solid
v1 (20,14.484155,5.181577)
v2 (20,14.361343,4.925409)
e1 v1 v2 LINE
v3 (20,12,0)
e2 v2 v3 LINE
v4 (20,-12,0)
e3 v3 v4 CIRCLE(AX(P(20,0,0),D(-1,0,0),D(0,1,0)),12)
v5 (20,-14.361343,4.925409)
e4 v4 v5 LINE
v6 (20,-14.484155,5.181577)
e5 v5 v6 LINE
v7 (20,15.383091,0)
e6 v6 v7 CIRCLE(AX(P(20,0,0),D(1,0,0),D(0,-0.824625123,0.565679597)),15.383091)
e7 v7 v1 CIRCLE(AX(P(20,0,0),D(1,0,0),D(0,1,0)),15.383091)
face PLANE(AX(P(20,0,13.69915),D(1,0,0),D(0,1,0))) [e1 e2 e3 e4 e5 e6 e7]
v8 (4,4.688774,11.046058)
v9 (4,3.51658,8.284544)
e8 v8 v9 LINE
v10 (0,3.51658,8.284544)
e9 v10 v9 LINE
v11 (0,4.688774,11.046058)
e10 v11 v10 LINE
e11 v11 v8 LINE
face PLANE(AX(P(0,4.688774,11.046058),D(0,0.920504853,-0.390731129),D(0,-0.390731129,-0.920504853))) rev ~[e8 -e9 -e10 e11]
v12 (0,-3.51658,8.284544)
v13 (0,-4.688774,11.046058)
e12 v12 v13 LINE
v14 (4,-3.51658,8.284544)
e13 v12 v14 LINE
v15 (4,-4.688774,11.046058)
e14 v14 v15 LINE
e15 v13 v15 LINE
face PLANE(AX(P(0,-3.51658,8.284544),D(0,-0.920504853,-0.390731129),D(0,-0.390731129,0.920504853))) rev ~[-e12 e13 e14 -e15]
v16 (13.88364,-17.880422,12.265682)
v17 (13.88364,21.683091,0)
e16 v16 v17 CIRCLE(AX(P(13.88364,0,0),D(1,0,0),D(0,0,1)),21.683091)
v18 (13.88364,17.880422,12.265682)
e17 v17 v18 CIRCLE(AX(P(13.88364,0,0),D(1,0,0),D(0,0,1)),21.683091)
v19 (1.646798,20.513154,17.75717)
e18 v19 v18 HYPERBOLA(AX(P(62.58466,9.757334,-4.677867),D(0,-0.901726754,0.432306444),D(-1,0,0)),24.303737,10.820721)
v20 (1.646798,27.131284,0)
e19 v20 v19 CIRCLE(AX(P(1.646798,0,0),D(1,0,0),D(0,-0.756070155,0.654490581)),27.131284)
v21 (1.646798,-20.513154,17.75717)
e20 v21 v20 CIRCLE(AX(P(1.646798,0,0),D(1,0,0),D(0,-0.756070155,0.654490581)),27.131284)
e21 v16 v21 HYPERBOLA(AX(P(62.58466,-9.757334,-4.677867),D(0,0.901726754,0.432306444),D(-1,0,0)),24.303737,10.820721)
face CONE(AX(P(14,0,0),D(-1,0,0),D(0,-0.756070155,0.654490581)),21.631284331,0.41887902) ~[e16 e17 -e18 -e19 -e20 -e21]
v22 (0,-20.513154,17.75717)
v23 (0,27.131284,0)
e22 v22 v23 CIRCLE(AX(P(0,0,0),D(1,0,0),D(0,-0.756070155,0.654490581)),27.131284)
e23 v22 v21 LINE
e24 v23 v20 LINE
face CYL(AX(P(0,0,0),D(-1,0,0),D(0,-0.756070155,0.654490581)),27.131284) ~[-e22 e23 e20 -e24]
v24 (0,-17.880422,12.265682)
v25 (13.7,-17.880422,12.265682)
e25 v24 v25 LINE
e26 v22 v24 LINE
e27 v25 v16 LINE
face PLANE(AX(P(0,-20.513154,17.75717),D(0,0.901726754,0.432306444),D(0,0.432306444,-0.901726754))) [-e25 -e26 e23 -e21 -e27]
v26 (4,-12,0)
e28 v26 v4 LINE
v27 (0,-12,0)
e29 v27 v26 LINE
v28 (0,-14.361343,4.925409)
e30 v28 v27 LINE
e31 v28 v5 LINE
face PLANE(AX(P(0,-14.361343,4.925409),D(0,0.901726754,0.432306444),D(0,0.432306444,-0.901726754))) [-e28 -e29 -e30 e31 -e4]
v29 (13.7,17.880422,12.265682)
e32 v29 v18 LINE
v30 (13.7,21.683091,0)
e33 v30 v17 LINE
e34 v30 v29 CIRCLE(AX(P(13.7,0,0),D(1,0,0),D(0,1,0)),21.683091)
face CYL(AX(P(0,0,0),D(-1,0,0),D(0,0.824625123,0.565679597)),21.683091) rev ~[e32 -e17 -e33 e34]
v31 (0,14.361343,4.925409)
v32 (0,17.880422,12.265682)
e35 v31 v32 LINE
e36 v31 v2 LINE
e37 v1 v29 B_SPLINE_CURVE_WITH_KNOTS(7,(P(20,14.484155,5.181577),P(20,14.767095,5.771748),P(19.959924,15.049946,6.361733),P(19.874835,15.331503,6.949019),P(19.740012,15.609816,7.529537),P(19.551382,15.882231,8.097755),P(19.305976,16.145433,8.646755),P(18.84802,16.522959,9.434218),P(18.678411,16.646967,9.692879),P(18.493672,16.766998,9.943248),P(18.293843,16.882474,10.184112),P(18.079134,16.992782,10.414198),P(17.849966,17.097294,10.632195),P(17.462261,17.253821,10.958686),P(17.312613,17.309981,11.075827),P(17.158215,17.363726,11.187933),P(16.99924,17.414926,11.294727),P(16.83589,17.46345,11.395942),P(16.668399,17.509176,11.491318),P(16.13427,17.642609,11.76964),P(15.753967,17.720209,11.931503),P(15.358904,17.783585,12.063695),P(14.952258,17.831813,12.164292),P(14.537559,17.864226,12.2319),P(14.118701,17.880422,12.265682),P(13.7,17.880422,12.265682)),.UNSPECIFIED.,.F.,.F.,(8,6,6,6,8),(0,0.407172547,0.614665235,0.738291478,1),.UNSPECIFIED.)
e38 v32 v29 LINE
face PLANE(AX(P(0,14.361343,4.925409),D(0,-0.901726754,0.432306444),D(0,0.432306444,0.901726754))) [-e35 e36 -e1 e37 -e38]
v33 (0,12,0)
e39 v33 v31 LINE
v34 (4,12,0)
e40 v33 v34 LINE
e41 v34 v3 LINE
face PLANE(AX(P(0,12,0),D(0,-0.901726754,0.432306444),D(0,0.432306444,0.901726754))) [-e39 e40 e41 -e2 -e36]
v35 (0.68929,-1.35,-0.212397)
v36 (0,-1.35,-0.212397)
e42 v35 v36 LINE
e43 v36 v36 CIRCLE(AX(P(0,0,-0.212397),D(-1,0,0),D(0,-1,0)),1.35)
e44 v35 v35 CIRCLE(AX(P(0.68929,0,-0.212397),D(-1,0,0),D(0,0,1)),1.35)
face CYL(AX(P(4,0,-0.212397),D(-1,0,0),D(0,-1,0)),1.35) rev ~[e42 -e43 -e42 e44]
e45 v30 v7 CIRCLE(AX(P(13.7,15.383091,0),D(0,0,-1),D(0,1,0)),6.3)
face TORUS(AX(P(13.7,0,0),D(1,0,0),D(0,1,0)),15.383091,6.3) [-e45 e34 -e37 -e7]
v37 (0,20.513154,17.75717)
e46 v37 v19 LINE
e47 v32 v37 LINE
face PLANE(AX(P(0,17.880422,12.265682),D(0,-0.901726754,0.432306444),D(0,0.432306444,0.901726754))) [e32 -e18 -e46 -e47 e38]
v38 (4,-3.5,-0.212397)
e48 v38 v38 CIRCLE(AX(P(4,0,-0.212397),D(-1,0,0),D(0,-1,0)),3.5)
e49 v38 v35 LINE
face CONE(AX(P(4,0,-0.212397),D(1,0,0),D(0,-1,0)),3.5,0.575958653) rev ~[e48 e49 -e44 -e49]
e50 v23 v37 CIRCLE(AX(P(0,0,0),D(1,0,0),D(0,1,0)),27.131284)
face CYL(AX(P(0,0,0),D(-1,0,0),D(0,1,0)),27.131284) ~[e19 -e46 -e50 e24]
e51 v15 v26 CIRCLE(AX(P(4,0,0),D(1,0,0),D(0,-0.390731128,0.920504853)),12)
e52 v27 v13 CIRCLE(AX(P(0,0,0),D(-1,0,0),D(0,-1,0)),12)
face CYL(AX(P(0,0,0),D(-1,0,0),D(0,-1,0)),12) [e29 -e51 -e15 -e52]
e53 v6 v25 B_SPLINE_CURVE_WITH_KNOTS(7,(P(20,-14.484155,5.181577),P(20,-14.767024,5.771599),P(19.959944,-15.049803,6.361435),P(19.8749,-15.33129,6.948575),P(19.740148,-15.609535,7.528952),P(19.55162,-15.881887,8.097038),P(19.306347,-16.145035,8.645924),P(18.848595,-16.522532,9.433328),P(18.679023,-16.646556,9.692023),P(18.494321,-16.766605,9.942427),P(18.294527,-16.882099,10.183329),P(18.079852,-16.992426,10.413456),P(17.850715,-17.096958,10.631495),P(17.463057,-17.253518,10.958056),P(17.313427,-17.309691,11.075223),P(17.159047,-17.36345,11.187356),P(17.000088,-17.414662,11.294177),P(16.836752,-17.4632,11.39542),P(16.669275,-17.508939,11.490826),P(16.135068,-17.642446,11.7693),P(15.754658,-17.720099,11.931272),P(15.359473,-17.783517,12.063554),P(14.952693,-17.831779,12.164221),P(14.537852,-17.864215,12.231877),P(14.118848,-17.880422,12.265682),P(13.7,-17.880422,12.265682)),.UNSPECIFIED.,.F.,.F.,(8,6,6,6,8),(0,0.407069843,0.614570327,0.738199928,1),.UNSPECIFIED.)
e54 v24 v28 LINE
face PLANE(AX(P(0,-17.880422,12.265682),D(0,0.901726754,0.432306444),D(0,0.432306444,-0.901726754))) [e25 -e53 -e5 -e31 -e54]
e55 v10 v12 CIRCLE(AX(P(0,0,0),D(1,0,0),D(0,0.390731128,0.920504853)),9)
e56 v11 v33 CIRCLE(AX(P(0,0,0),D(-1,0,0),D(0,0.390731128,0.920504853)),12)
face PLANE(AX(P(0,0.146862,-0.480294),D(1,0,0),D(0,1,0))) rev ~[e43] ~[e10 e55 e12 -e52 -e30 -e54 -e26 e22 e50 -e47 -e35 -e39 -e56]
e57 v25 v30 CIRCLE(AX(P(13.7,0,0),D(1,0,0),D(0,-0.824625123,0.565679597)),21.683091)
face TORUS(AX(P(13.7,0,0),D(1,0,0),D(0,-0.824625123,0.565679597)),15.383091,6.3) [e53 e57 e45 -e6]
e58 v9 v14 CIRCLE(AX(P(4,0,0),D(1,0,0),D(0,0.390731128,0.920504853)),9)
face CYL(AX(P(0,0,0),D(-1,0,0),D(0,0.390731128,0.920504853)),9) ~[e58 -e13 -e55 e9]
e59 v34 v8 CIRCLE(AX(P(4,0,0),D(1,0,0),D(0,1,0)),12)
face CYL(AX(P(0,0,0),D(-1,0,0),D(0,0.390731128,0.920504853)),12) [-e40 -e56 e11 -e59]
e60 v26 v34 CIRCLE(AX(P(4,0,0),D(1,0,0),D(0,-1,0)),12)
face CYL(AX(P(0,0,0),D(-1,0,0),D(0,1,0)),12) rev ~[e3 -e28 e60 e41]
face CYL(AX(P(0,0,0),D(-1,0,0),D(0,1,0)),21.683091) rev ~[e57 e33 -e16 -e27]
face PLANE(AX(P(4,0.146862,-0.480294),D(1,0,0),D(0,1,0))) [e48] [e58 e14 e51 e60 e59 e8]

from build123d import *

# Parameters (mm, degrees)
F1_DEPTH       = 20
F2_DEPTH       = 20
F3_R           = 6.3
F4_DEPTH       = 14
F5_S5_R        = 21.6830909865
F5_T6_DEPTH    = 40
F6_DEPTH       = 4
F7_DEPTH       = 25
F9_D           = 2.7
F9_DEPTH       = 12
F9_CSINK_D     = 7
F9_CSINK_ANGLE = 66
F9_TIP         = 0.8111618357


# Not quite as in the source:
# - a fillet or chamfer that OpenCascade refuses, or shapes differently, is made with other operations: its cross-section is extruded or revolved along the edge and cut away or added


with BuildPart() as f1:
    # F0 (on Right) → F1 (new body)
    with BuildSketch(Plane.YZ):
        with BuildLine():
            ThreePointArc((4.6887735419, 11.0460582414), (10.0066298648, 6.6232438237), (12, 0))
            Line((12, 0), (14.3613430429, 4.925409334))
            ThreePointArc((14.3613430429, 4.925409334), (0, 15.1824843522), (-14.3613430429, 4.925409334))
            Line((-14.3613430429, 4.925409334), (-12, 0))
            ThreePointArc((-12, 0), (-10.0066298648, 6.6232438237), (-4.6887735419, 11.0460582414))
            ThreePointArc((-4.6887735419, 11.0460582414), (0, 12), (4.6887735419, 11.0460582414))
        make_face()
        with BuildLine():
            Line((14.3613430429, 4.925409334), (12, 0))
            ThreePointArc((12, 0), (0, -12), (-12, 0))
            Line((-12, 0), (-14.3613430429, 4.925409334))
            ThreePointArc((-14.3613430429, 4.925409334), (-2.4966943224, -14.9757920847), (15.1824843522, 0))
            ThreePointArc((15.1824843522, 0), (14.9757920847, 2.4966943224), (14.3613430429, 4.925409334))
        make_face()
    extrude(amount=F1_DEPTH)

    # F0 (on Right) → F2 (join)
    with BuildSketch(Plane.YZ):
        with BuildLine():
            ThreePointArc((-14.3613430429, 4.925409334), (0, 15.1824843522), (14.3613430429, 4.925409334))
            Line((14.3613430429, 4.925409334), (17.8804215677, 12.2656821778))
            ThreePointArc((17.8804215677, 12.2656821778), (13.0689294726, 17.30200905), (6.9088656071, 20.5529562533))
            Line((6.9088656071, 20.5529562533), (-6.9088656071, 20.5529562533))
            ThreePointArc((-6.9088656071, 20.5529562533), (-13.0689294726, 17.30200905), (-17.8804215677, 12.2656821778))
            Line((-17.8804215677, 12.2656821778), (-14.3613430429, 4.925409334))
        make_face()
        with BuildLine():
            Line((17.8804215677, 12.2656821778), (14.3613430429, 4.925409334))
            ThreePointArc((14.3613430429, 4.925409334), (14.9757920847, 2.4966943224), (15.1824843522, 0))
            ThreePointArc((15.1824843522, 0), (-2.4966943224, -14.9757920847), (-14.3613430429, 4.925409334))
            Line((-14.3613430429, 4.925409334), (-17.8804215677, 12.2656821778))
            ThreePointArc((-17.8804215677, 12.2656821778), (-6.4208109689, -20.710616148), (21.6830909865, 0))
            ThreePointArc((21.6830909865, 0), (20.710616148, 6.4208109689), (17.8804215677, 12.2656821778))
        make_face()
        with BuildLine():
            Line((-6.9088656071, 20.5529562533), (6.9088656071, 20.5529562533))
            ThreePointArc((6.9088656071, 20.5529562533), (0, 21.6830909865), (-6.9088656071, 20.5529562533))
        make_face()
    extrude(amount=F2_DEPTH)

    # F3
    f3_edges = [f1.edges().sort_by_distance(p)[0] for p in [
        (20, -6.908866, -20.552956),
    ]]
    fillet(f3_edges, radius=F3_R)

    # F0 (on Right) → F4 (join)
    with BuildSketch(Plane.YZ):
        with BuildLine():
            ThreePointArc((6.9088656071, 20.5529562533), (13.0689294726, 17.30200905), (17.8804215677, 12.2656821778))
            Line((17.8804215677, 12.2656821778), (20.5131543573, 17.7571700385))
            ThreePointArc((20.5131543573, 17.7571700385), (19.1631742939, 19.2062318127), (17.7110863222, 20.5529562533))
            Line((17.7110863222, 20.5529562533), (6.9088656071, 20.5529562533))
        make_face()
        with BuildLine():
            ThreePointArc((-6.9088656071, 20.5529562533), (0, 21.6830909865), (6.9088656071, 20.5529562533))
            Line((6.9088656071, 20.5529562533), (17.7110863222, 20.5529562533))
            ThreePointArc((17.7110863222, 20.5529562533), (0, 27.1312843312), (-17.7110863222, 20.5529562533))
            Line((-17.7110863222, 20.5529562533), (-6.9088656071, 20.5529562533))
        make_face()
        with BuildLine():
            Line((-20.5131543573, 17.7571700385), (-17.8804215677, 12.2656821778))
            ThreePointArc((-17.8804215677, 12.2656821778), (-13.0689294726, 17.30200905), (-6.9088656071, 20.5529562533))
            Line((-6.9088656071, 20.5529562533), (-17.7110863222, 20.5529562533))
            ThreePointArc((-17.7110863222, 20.5529562533), (-19.1631742939, 19.2062318127), (-20.5131543573, 17.7571700385))
        make_face()
        with BuildLine():
            Line((20.5131543573, 17.7571700385), (17.8804215677, 12.2656821778))
            ThreePointArc((17.8804215677, 12.2656821778), (20.710616148, 6.4208109689), (21.6830909865, 0))
            ThreePointArc((21.6830909865, 0), (-6.4208109689, -20.710616148), (-17.8804215677, 12.2656821778))
            Line((-17.8804215677, 12.2656821778), (-20.5131543573, 17.7571700385))
            ThreePointArc((-20.5131543573, 17.7571700385), (-9.4751877571, -25.4229700552), (27.1312843312, 0))
            ThreePointArc((27.1312843312, 0), (25.4229700552, 9.4751877571), (20.5131543573, 17.7571700385))
        make_face()
    extrude(amount=F4_DEPTH)

    # F5: chamfer of 5.5 x 12.3532022565 on 1 edges, made by hand


with BuildPart() as f5_tool2:
    # F5_s3 → F5_t4 (revolve)
    with BuildSketch(Plane(origin=(0, 0, 0), x_dir=(1, 0, 0), z_dir=(0, 0.6544905808, 0.7560701553))):
        Polygon((14, -21.6312843312), (1.6467977435, -27.1312843312), (14, -27.1312843312), align=None)
    revolve(axis=Axis((14, 0, 0), (1, 0, 0)))

    # F5_s5 → F5_t6 (cut, symmetric)
    with BuildSketch(Plane.YZ.offset(7.8)):
        Circle(F5_S5_R)
    extrude(amount=F5_T6_DEPTH, both=True, mode=Mode.SUBTRACT)


with BuildPart() as f1_1:
    add(f1.part)

    # F5_t1: cut F5_tool2
    add(f5_tool2.part, mode=Mode.SUBTRACT)

    # F0 (on Right) → F6 (join)
    with BuildSketch(Plane.YZ):
        with BuildLine():
            ThreePointArc((-12, 0), (0, -12), (12, 0))
            ThreePointArc((12, 0), (10.0066298648, 6.6232438237), (4.6887735419, 11.0460582414))
            Line((4.6887735419, 11.0460582414), (3.5165801564, 8.2845436811))
            ThreePointArc((3.5165801564, 8.2845436811), (7.5049723986, 4.9674328678), (9, 0))
            ThreePointArc((9, 0), (-4.9674328678, -7.5049723986), (-3.5165801564, 8.2845436811))
            Line((-3.5165801564, 8.2845436811), (-4.6887735419, 11.0460582414))
            ThreePointArc((-4.6887735419, 11.0460582414), (-10.0066298648, 6.6232438237), (-12, 0))
        make_face()
        with BuildLine():
            ThreePointArc((9, 0), (7.5049723986, 4.9674328678), (3.5165801564, 8.2845436811))
            Line((3.5165801564, 8.2845436811), (0, 0))
            Line((0, 0), (-3.5165801564, 8.2845436811))
            ThreePointArc((-3.5165801564, 8.2845436811), (-4.9674328678, -7.5049723986), (9, 0))
        make_face()
        with BuildLine():
            Line((0, 0), (3.5165801564, 8.2845436811))
            ThreePointArc((3.5165801564, 8.2845436811), (0, 9), (-3.5165801564, 8.2845436811))
            Line((-3.5165801564, 8.2845436811), (0, 0))
        make_face()
    extrude(amount=F6_DEPTH)

    # F0 (on Right) → F7 (cut)
    with BuildSketch(Plane.YZ):
        with BuildLine():
            ThreePointArc((4.6887735419, 11.0460582414), (10.0066298648, 6.6232438237), (12, 0))
            Line((12, 0), (14.3613430429, 4.925409334))
            ThreePointArc((14.3613430429, 4.925409334), (0, 15.1824843522), (-14.3613430429, 4.925409334))
            Line((-14.3613430429, 4.925409334), (-12, 0))
            ThreePointArc((-12, 0), (-10.0066298648, 6.6232438237), (-4.6887735419, 11.0460582414))
            ThreePointArc((-4.6887735419, 11.0460582414), (0, 12), (4.6887735419, 11.0460582414))
        make_face()
        with BuildLine():
            ThreePointArc((-14.3613430429, 4.925409334), (0, 15.1824843522), (14.3613430429, 4.925409334))
            Line((14.3613430429, 4.925409334), (17.8804215677, 12.2656821778))
            ThreePointArc((17.8804215677, 12.2656821778), (13.0689294726, 17.30200905), (6.9088656071, 20.5529562533))
            Line((6.9088656071, 20.5529562533), (-6.9088656071, 20.5529562533))
            ThreePointArc((-6.9088656071, 20.5529562533), (-13.0689294726, 17.30200905), (-17.8804215677, 12.2656821778))
            Line((-17.8804215677, 12.2656821778), (-14.3613430429, 4.925409334))
        make_face()
        with BuildLine():
            Line((-6.9088656071, 20.5529562533), (6.9088656071, 20.5529562533))
            ThreePointArc((6.9088656071, 20.5529562533), (0, 21.6830909865), (-6.9088656071, 20.5529562533))
        make_face()
        with BuildLine():
            ThreePointArc((-6.9088656071, 20.5529562533), (0, 21.6830909865), (6.9088656071, 20.5529562533))
            Line((6.9088656071, 20.5529562533), (17.7110863222, 20.5529562533))
            ThreePointArc((17.7110863222, 20.5529562533), (0, 27.1312843312), (-17.7110863222, 20.5529562533))
            Line((-17.7110863222, 20.5529562533), (-6.9088656071, 20.5529562533))
        make_face()
        with BuildLine():
            Line((-20.5131543573, 17.7571700385), (-17.8804215677, 12.2656821778))
            ThreePointArc((-17.8804215677, 12.2656821778), (-13.0689294726, 17.30200905), (-6.9088656071, 20.5529562533))
            Line((-6.9088656071, 20.5529562533), (-17.7110863222, 20.5529562533))
            ThreePointArc((-17.7110863222, 20.5529562533), (-19.1631742939, 19.2062318127), (-20.5131543573, 17.7571700385))
        make_face()
        with BuildLine():
            ThreePointArc((6.9088656071, 20.5529562533), (13.0689294726, 17.30200905), (17.8804215677, 12.2656821778))
            Line((17.8804215677, 12.2656821778), (20.5131543573, 17.7571700385))
            ThreePointArc((20.5131543573, 17.7571700385), (19.1631742939, 19.2062318127), (17.7110863222, 20.5529562533))
            Line((17.7110863222, 20.5529562533), (6.9088656071, 20.5529562533))
        make_face()
    extrude(amount=F7_DEPTH, mode=Mode.SUBTRACT)

    # F9
    with Locations(Plane.YZ.offset(4)):
        with Locations((0, -0.2123973536)):
            CounterSinkHole(F9_D / 2, F9_CSINK_D / 2, depth=F9_DEPTH, counter_sink_angle=F9_CSINK_ANGLE)
            with Locations((0, 0, -(F9_DEPTH + F9_TIP / 2))):  # 118° drill point
                Cone(0, F9_D / 2, F9_TIP, mode=Mode.SUBTRACT)


solid = f1_1.part
